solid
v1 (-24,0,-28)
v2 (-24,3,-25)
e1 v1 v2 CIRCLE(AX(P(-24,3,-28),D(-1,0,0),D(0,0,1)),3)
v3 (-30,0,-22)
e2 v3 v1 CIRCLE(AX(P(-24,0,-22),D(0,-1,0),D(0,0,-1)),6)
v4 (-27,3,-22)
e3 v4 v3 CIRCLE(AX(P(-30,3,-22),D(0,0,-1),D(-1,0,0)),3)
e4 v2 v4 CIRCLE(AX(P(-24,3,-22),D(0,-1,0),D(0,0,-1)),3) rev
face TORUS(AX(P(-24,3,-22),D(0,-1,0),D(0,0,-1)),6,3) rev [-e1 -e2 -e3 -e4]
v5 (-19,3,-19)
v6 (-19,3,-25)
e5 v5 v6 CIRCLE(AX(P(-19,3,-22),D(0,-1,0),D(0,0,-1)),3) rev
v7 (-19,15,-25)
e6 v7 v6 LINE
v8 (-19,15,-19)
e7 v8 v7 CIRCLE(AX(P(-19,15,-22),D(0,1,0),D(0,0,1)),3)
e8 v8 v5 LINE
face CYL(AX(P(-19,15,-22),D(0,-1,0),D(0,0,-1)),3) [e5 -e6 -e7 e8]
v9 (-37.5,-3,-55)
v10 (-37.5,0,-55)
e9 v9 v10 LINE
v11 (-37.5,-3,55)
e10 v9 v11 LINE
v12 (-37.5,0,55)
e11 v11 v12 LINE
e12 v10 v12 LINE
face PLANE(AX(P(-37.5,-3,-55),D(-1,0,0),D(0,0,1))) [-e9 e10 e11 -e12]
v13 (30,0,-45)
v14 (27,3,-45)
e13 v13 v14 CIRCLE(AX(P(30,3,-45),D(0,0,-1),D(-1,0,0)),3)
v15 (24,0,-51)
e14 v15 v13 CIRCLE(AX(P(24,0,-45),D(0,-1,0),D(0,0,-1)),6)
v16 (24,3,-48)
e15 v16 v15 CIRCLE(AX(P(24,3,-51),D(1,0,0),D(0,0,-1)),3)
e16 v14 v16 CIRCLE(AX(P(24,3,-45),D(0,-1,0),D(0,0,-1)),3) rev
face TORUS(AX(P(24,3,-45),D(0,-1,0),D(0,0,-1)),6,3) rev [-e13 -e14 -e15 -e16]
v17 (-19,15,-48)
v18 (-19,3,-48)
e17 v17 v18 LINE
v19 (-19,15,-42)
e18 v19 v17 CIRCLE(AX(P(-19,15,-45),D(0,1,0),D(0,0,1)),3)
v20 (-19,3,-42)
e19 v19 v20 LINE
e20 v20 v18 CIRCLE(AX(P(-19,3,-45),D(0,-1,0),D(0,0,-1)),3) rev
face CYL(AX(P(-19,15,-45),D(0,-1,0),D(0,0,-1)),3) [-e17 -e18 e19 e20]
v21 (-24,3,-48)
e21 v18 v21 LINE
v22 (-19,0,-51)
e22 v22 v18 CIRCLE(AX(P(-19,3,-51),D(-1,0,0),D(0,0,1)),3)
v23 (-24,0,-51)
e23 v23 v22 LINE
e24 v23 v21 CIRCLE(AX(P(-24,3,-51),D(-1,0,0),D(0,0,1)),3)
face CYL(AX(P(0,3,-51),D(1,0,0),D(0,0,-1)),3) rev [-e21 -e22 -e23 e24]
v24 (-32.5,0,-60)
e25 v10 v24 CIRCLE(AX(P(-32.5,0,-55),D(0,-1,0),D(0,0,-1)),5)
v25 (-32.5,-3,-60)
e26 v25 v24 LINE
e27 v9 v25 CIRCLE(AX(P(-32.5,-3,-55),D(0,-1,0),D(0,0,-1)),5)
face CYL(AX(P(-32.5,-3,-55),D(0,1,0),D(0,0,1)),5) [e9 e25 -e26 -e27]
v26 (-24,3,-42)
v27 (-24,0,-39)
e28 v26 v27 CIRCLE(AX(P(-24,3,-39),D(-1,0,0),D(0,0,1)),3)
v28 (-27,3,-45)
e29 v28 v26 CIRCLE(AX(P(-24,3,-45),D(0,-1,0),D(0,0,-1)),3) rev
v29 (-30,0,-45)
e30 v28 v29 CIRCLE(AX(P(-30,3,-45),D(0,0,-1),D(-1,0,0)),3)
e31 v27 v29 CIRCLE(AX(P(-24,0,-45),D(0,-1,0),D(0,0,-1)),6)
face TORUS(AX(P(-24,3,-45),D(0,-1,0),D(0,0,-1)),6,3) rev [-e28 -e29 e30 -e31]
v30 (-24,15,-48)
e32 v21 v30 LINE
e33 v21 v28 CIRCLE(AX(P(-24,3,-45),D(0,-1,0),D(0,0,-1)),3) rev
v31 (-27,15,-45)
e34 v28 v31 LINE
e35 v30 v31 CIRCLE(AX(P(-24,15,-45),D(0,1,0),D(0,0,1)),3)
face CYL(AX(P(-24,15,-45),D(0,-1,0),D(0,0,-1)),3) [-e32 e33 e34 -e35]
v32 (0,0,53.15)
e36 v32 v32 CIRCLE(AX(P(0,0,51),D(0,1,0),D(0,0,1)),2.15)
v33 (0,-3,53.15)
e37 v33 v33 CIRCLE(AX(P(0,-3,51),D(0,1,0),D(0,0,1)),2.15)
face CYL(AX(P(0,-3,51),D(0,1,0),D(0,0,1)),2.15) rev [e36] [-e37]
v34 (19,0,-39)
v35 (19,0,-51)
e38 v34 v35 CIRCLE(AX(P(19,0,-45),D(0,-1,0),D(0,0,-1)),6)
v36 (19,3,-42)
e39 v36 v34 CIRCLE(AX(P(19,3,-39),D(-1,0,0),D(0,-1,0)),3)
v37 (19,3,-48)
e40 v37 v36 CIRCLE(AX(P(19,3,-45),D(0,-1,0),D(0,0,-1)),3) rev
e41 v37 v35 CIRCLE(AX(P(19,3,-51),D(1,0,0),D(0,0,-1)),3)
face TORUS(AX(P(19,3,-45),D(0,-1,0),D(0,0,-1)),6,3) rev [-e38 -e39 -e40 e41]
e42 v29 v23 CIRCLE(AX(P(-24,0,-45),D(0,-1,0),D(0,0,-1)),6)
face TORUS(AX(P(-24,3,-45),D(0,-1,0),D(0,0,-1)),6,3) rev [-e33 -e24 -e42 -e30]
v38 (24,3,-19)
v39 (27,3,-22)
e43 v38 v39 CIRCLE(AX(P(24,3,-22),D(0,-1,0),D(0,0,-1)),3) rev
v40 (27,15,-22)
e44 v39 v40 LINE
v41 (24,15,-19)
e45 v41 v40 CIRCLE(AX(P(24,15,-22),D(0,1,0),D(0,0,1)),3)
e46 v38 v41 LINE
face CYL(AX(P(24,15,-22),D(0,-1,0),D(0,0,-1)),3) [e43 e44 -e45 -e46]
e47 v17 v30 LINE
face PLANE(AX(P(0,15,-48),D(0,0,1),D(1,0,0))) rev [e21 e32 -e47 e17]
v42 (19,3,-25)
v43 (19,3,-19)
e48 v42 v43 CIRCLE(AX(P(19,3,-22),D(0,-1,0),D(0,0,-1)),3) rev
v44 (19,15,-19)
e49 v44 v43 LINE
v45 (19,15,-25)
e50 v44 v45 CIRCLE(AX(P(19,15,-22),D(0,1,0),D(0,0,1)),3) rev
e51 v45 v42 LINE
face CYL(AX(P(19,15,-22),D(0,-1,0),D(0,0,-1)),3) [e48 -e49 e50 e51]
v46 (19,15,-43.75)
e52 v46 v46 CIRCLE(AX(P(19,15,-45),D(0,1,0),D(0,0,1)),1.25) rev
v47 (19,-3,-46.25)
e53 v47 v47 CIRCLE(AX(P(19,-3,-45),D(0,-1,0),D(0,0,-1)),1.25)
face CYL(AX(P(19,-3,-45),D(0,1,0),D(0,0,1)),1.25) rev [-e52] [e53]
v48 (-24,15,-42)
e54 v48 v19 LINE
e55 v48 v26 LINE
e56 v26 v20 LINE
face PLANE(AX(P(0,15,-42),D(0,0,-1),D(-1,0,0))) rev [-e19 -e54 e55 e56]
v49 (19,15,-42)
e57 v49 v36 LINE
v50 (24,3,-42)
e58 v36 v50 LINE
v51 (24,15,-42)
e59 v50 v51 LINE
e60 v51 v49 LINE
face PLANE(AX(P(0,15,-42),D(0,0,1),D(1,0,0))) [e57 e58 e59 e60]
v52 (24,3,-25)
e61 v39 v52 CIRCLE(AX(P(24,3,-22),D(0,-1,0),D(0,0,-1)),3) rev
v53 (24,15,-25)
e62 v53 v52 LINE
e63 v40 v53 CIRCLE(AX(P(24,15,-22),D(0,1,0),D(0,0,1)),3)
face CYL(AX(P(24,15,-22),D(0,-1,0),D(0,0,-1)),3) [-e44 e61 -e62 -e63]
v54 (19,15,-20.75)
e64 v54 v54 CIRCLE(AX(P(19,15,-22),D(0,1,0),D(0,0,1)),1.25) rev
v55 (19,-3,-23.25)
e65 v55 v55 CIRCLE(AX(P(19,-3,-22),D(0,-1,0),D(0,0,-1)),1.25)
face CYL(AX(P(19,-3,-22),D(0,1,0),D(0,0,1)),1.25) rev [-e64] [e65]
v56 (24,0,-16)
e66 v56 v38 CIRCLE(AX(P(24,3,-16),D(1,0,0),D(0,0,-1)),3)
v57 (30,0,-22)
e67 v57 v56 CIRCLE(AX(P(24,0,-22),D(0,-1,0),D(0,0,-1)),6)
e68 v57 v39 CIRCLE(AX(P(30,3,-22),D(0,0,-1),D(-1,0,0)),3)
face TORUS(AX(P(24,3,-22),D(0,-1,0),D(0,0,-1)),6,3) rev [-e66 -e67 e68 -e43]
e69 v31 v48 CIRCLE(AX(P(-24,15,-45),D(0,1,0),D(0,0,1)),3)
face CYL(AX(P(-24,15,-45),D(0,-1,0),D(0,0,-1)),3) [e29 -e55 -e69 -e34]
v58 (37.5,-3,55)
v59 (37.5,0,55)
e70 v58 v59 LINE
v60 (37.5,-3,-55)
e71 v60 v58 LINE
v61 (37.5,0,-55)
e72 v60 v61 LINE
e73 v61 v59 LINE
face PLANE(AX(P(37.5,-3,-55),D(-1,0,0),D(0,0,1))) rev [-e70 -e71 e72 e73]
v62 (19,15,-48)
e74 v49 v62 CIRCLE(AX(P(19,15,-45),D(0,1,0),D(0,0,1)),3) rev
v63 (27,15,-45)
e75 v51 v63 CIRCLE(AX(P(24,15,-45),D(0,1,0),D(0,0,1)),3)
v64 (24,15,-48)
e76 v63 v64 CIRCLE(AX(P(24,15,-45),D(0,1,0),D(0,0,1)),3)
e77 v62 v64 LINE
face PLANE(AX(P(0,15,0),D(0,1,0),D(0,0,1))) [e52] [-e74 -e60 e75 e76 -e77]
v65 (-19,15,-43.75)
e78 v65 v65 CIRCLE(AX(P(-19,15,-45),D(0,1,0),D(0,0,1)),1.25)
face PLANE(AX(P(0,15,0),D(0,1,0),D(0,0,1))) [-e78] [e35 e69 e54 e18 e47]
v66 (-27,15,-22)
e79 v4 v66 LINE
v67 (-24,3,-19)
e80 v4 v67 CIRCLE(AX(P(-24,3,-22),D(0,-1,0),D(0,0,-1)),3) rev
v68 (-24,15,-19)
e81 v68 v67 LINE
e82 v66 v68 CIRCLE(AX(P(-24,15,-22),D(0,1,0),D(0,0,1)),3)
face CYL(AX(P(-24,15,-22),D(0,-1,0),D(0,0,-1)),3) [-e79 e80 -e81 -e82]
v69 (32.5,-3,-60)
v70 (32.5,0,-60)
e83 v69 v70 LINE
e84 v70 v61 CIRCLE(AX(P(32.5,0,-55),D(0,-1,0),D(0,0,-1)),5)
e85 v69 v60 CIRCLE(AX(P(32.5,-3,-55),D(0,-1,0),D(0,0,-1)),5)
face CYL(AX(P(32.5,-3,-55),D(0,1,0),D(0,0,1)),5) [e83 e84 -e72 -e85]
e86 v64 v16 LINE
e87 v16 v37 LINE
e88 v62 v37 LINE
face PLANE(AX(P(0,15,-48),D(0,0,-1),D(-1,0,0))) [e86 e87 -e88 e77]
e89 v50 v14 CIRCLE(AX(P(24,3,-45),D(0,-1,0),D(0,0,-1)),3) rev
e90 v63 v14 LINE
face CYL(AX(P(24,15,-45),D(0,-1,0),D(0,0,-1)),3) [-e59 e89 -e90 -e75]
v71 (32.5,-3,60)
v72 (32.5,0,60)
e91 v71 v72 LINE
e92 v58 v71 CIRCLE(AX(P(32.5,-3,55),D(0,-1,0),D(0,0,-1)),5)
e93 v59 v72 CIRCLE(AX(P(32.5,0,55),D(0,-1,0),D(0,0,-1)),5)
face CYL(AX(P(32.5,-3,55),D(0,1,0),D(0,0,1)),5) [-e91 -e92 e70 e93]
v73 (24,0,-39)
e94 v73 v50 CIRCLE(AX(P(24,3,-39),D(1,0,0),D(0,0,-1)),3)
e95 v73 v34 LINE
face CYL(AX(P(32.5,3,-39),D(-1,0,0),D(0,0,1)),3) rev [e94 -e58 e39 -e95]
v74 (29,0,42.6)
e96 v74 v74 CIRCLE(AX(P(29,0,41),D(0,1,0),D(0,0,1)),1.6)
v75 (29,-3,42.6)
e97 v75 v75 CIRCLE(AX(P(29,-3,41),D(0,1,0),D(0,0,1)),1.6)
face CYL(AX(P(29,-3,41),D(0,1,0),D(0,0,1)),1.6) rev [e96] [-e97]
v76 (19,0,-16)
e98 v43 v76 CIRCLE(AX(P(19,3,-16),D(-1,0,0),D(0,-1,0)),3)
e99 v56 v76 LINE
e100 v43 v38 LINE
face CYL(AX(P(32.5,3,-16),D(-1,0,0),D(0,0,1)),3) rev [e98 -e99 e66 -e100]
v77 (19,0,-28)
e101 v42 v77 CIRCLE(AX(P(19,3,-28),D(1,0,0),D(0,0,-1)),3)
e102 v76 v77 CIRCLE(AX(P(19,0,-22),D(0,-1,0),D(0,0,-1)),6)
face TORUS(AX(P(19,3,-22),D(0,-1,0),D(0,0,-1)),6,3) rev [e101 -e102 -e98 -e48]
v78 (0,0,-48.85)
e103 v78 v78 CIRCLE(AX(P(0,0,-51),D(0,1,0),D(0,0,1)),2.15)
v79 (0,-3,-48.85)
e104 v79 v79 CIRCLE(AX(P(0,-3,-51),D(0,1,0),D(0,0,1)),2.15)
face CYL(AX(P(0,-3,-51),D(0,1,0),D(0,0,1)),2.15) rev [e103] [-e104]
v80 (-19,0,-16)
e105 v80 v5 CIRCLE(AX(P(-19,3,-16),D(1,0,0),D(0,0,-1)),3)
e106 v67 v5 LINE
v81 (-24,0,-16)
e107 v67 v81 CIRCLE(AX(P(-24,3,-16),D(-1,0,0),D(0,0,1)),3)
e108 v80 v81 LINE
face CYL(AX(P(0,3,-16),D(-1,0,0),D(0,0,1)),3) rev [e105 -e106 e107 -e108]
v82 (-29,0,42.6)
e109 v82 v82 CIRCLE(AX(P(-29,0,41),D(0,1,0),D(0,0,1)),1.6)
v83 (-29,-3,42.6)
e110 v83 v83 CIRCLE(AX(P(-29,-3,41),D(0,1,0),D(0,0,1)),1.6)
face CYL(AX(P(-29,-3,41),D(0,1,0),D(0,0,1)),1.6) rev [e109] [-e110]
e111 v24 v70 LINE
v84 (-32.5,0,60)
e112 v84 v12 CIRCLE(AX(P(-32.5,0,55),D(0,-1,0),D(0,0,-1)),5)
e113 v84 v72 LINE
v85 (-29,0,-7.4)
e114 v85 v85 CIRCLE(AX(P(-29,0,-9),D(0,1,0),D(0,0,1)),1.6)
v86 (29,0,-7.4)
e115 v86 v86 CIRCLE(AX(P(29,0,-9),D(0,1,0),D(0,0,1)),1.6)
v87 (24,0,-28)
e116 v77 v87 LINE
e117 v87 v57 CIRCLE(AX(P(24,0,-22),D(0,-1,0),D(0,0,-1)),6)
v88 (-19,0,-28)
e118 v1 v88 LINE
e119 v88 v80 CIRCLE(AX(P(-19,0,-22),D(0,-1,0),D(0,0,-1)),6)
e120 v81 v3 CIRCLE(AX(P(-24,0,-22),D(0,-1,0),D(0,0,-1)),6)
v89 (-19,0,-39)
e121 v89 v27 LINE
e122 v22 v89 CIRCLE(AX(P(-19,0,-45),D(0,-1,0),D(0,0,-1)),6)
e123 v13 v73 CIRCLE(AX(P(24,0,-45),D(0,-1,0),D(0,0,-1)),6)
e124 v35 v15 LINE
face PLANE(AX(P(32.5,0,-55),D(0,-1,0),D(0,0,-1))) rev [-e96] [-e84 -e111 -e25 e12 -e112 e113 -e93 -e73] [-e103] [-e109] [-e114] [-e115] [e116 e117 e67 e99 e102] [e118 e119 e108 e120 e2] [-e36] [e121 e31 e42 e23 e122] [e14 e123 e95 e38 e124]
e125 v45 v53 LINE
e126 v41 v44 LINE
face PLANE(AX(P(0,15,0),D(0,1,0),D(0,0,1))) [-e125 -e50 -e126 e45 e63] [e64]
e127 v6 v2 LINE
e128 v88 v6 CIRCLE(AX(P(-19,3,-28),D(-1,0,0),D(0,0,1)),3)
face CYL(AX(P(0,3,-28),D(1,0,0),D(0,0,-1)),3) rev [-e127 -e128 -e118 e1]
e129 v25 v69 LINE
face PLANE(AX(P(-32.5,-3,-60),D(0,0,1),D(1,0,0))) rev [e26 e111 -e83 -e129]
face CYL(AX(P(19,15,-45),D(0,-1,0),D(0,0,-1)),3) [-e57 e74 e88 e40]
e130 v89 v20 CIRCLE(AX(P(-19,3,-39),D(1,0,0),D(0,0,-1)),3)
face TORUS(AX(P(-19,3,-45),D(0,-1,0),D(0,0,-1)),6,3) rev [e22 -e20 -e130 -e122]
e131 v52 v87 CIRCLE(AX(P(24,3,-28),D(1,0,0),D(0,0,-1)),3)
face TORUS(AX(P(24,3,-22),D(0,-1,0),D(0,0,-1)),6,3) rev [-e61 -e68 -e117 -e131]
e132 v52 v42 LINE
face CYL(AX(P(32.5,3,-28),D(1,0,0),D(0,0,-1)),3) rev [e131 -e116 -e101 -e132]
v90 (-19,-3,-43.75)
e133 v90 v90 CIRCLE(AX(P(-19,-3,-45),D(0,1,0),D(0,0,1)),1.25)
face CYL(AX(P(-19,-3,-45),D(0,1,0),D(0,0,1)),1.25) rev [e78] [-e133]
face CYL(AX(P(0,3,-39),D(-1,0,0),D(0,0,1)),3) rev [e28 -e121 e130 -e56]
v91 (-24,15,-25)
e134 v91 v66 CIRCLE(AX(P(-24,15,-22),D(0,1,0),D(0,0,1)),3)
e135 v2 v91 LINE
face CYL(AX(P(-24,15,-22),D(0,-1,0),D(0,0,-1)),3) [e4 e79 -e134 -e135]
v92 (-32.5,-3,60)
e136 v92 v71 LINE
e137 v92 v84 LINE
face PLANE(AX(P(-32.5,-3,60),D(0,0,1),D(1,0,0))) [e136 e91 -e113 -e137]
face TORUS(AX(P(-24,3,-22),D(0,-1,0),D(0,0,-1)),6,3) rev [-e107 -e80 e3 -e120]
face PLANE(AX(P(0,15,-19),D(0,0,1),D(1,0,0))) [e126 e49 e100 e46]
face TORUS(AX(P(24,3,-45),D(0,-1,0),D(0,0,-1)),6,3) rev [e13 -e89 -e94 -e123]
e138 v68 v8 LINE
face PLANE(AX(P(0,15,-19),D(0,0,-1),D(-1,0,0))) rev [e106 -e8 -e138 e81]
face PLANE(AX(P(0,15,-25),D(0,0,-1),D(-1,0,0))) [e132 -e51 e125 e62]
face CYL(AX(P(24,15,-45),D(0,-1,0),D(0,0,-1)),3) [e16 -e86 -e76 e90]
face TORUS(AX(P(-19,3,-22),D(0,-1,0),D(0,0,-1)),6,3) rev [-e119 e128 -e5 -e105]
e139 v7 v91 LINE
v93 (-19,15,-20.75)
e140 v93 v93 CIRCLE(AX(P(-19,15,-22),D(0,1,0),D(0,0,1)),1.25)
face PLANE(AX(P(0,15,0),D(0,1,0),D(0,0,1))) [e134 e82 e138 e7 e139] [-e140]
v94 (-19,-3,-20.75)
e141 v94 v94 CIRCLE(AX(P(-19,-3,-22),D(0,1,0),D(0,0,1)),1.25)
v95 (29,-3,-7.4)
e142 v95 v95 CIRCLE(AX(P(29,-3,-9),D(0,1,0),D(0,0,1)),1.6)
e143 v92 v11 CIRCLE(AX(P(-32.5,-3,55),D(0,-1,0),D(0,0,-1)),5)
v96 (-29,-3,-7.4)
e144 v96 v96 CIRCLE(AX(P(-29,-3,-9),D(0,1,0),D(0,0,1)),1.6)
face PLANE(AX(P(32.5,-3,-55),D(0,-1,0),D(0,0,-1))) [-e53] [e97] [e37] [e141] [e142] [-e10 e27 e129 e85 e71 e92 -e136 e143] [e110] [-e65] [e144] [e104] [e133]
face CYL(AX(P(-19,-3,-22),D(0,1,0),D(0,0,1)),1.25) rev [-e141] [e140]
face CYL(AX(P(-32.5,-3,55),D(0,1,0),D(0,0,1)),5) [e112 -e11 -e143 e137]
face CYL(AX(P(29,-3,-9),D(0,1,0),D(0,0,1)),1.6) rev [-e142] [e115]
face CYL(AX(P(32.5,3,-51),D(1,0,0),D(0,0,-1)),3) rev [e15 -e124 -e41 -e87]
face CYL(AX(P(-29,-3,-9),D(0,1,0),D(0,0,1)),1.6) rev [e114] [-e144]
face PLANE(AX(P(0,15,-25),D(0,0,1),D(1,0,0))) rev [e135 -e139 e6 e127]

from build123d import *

# Parameters (mm, degrees)
BOSS_EXTRUDE1_DEPTH = 3
SKETCH1_3_R         = 2.15
SKETCH1_3_R_2       = 1.6
SKETCH1_3_R_3       = 1.25
CUT_EXTRUDE1_DEPTH  = 71.818429805
BOSS_EXTRUDE2_START = 15
SKETCH1_4_R         = 1.25
BOSS_EXTRUDE2_DEPTH = 15
FILLET2_R           = 3
FILLET1_R           = 3


with BuildPart() as part:
    # Sketch1 → Boss-Extrude1 (new body)
    with BuildSketch(Plane(origin=(0, 0, 0), x_dir=(1, 0, 0), z_dir=(0, 1, 0))):
        with BuildLine():
            Line((-32.5, 60), (32.5, 60))
            ThreePointArc((32.5, 60), (36.035533906, 58.535533906), (37.5, 55))
            Line((37.5, 55), (37.5, -55))
            ThreePointArc((37.5, -55), (36.035533906, -58.535533906), (32.5, -60))
            Line((32.5, -60), (-32.5, -60))
            ThreePointArc((-32.5, -60), (-36.035533906, -58.535533906), (-37.5, -55))
            Line((-37.5, -55), (-37.5, 55))
            ThreePointArc((-37.5, 55), (-36.035533906, 58.535533906), (-32.5, 60))
        make_face()
    extrude(amount=-BOSS_EXTRUDE1_DEPTH)

    # Sketch1<3> → Cut-Extrude1 (cut, through all)
    with BuildSketch(Plane(origin=(0, 0, 0), x_dir=(1, 0, 0), z_dir=(0, 1, 0))):
        with Locations(Location((0, 51, 0), (0, 0, 270))):
            Circle(SKETCH1_3_R)
        with Locations(Location((0, -51, 0), (0, 0, 270))):
            Circle(SKETCH1_3_R)
        with Locations(Location((-29, -41, 0), (0, 0, 270))):
            Circle(SKETCH1_3_R_2)
        with Locations(Location((29, -41, 0), (0, 0, 270))):
            Circle(SKETCH1_3_R_2)
        with Locations(Location((29, 9, 0), (0, 0, 270))):
            Circle(SKETCH1_3_R_2)
        with Locations(Location((-29, 9, 0), (0, 0, 270))):
            Circle(SKETCH1_3_R_2)
        with Locations(Location((-19, 45, 0), (0, 0, 270))):
            Circle(SKETCH1_3_R_3)
        with Locations(Location((-19, 22, 0), (0, 0, 270))):
            Circle(SKETCH1_3_R_3)
        with Locations(Location((19, 22, 0), (0, 0, 90))):
            Circle(SKETCH1_3_R_3)
        with Locations(Location((19, 45, 0), (0, 0, 90))):
            Circle(SKETCH1_3_R_3)
    extrude(amount=-CUT_EXTRUDE1_DEPTH, mode=Mode.SUBTRACT)

    # Sketch1<4> → Boss-Extrude2 (add)
    # profile 1 of 4: a face of its own
    with BuildSketch(Plane(origin=(0, 0, 0), x_dir=(1, 0, 0), z_dir=(0, 1, 0)).offset(BOSS_EXTRUDE2_START)):
        with BuildLine():
            Line((-27, 42), (-19, 42))
            ThreePointArc((-19, 42), (-16, 45), (-19, 48))
            Line((-19, 48), (-27, 48))
            Line((-27, 48), (-27, 42))
        make_face()
        with Locations(Location((-19, 45, 0), (0, 0, 270))):
            Circle(SKETCH1_4_R, mode=Mode.SUBTRACT)
    # profile 2 of 4: a face of its own
    with BuildSketch(Plane(origin=(0, 0, 0), x_dir=(1, 0, 0), z_dir=(0, 1, 0)).offset(BOSS_EXTRUDE2_START)):
        with BuildLine():
            Line((-27, 19), (-19, 19))
            ThreePointArc((-19, 19), (-16, 22), (-19, 25))
            Line((-19, 25), (-27, 25))
            Line((-27, 25), (-27, 19))
        make_face()
        with Locations(Location((-19, 22, 0), (0, 0, 270))):
            Circle(SKETCH1_4_R, mode=Mode.SUBTRACT)
    # profile 3 of 4: a face of its own
    with BuildSketch(Plane(origin=(0, 0, 0), x_dir=(1, 0, 0), z_dir=(0, 1, 0)).offset(BOSS_EXTRUDE2_START)):
        with BuildLine():
            ThreePointArc((19, 19), (16, 22), (19, 25))
            Line((19, 25), (27, 25))
            Line((27, 25), (27, 19))
            Line((27, 19), (19, 19))
        make_face()
        with Locations(Location((19, 22, 0), (0, 0, 270))):
            Circle(SKETCH1_4_R, mode=Mode.SUBTRACT)
    # profile 4 of 4: a face of its own
    with BuildSketch(Plane(origin=(0, 0, 0), x_dir=(1, 0, 0), z_dir=(0, 1, 0)).offset(BOSS_EXTRUDE2_START)):
        with BuildLine():
            ThreePointArc((19, 42), (16, 45), (19, 48))
            Line((19, 48), (27, 48))
            Line((27, 48), (27, 42))
            Line((27, 42), (19, 42))
        make_face()
        with Locations(Location((19, 45, 0), (0, 0, 270))):
            Circle(SKETCH1_4_R, mode=Mode.SUBTRACT)
    extrude(amount=-BOSS_EXTRUDE2_DEPTH)

    # Fillet2
    fillet2_edges = [part.edges().sort_by_distance(p)[0] for p in [
        (-27, 7.5, -48),
        (-27, 7.5, -42),
        (-27, 7.5, -25),
        (-27, 7.5, -19),
        (27, 7.5, -19),
        (27, 7.5, -25),
        (27, 7.5, -48),
        (27, 7.5, -42),
    ]]
    fillet(fillet2_edges, radius=FILLET2_R - 0.0001)  # a hair under: the kernel refuses the full size

    # Fillet1
    fillet1_edges = [part.edges().sort_by_distance(p)[0] for p in [
        (16, 0, -22),
        (21.50005, 0, -25),
        (16, 0, -45),
        (21.50005, 0, -48),
        (-21.50005, 0, -42),
        (-21.50005, 0, -19),
        (21.50005, 0, -19),
        (21.50005, 0, -42),
        (-26.121349633, 0, -47.121349633),
        (-26.121349633, 0, -42.878650367),
        (-26.121349633, 0, -24.121349633),
        (-26.121349633, 0, -19.878650367),
        (26.121349633, 0, -19.878650367),
        (26.121349633, 0, -24.121349633),
        (26.121349633, 0, -47.121349633),
        (26.121349633, 0, -42.878650367),
        (-16, 0, -45),
        (-21.50005, 0, -48),
        (-16, 0, -22),
        (-21.50005, 0, -25),
    ]]
    fillet(fillet1_edges, radius=FILLET1_R)


solid = part.part
